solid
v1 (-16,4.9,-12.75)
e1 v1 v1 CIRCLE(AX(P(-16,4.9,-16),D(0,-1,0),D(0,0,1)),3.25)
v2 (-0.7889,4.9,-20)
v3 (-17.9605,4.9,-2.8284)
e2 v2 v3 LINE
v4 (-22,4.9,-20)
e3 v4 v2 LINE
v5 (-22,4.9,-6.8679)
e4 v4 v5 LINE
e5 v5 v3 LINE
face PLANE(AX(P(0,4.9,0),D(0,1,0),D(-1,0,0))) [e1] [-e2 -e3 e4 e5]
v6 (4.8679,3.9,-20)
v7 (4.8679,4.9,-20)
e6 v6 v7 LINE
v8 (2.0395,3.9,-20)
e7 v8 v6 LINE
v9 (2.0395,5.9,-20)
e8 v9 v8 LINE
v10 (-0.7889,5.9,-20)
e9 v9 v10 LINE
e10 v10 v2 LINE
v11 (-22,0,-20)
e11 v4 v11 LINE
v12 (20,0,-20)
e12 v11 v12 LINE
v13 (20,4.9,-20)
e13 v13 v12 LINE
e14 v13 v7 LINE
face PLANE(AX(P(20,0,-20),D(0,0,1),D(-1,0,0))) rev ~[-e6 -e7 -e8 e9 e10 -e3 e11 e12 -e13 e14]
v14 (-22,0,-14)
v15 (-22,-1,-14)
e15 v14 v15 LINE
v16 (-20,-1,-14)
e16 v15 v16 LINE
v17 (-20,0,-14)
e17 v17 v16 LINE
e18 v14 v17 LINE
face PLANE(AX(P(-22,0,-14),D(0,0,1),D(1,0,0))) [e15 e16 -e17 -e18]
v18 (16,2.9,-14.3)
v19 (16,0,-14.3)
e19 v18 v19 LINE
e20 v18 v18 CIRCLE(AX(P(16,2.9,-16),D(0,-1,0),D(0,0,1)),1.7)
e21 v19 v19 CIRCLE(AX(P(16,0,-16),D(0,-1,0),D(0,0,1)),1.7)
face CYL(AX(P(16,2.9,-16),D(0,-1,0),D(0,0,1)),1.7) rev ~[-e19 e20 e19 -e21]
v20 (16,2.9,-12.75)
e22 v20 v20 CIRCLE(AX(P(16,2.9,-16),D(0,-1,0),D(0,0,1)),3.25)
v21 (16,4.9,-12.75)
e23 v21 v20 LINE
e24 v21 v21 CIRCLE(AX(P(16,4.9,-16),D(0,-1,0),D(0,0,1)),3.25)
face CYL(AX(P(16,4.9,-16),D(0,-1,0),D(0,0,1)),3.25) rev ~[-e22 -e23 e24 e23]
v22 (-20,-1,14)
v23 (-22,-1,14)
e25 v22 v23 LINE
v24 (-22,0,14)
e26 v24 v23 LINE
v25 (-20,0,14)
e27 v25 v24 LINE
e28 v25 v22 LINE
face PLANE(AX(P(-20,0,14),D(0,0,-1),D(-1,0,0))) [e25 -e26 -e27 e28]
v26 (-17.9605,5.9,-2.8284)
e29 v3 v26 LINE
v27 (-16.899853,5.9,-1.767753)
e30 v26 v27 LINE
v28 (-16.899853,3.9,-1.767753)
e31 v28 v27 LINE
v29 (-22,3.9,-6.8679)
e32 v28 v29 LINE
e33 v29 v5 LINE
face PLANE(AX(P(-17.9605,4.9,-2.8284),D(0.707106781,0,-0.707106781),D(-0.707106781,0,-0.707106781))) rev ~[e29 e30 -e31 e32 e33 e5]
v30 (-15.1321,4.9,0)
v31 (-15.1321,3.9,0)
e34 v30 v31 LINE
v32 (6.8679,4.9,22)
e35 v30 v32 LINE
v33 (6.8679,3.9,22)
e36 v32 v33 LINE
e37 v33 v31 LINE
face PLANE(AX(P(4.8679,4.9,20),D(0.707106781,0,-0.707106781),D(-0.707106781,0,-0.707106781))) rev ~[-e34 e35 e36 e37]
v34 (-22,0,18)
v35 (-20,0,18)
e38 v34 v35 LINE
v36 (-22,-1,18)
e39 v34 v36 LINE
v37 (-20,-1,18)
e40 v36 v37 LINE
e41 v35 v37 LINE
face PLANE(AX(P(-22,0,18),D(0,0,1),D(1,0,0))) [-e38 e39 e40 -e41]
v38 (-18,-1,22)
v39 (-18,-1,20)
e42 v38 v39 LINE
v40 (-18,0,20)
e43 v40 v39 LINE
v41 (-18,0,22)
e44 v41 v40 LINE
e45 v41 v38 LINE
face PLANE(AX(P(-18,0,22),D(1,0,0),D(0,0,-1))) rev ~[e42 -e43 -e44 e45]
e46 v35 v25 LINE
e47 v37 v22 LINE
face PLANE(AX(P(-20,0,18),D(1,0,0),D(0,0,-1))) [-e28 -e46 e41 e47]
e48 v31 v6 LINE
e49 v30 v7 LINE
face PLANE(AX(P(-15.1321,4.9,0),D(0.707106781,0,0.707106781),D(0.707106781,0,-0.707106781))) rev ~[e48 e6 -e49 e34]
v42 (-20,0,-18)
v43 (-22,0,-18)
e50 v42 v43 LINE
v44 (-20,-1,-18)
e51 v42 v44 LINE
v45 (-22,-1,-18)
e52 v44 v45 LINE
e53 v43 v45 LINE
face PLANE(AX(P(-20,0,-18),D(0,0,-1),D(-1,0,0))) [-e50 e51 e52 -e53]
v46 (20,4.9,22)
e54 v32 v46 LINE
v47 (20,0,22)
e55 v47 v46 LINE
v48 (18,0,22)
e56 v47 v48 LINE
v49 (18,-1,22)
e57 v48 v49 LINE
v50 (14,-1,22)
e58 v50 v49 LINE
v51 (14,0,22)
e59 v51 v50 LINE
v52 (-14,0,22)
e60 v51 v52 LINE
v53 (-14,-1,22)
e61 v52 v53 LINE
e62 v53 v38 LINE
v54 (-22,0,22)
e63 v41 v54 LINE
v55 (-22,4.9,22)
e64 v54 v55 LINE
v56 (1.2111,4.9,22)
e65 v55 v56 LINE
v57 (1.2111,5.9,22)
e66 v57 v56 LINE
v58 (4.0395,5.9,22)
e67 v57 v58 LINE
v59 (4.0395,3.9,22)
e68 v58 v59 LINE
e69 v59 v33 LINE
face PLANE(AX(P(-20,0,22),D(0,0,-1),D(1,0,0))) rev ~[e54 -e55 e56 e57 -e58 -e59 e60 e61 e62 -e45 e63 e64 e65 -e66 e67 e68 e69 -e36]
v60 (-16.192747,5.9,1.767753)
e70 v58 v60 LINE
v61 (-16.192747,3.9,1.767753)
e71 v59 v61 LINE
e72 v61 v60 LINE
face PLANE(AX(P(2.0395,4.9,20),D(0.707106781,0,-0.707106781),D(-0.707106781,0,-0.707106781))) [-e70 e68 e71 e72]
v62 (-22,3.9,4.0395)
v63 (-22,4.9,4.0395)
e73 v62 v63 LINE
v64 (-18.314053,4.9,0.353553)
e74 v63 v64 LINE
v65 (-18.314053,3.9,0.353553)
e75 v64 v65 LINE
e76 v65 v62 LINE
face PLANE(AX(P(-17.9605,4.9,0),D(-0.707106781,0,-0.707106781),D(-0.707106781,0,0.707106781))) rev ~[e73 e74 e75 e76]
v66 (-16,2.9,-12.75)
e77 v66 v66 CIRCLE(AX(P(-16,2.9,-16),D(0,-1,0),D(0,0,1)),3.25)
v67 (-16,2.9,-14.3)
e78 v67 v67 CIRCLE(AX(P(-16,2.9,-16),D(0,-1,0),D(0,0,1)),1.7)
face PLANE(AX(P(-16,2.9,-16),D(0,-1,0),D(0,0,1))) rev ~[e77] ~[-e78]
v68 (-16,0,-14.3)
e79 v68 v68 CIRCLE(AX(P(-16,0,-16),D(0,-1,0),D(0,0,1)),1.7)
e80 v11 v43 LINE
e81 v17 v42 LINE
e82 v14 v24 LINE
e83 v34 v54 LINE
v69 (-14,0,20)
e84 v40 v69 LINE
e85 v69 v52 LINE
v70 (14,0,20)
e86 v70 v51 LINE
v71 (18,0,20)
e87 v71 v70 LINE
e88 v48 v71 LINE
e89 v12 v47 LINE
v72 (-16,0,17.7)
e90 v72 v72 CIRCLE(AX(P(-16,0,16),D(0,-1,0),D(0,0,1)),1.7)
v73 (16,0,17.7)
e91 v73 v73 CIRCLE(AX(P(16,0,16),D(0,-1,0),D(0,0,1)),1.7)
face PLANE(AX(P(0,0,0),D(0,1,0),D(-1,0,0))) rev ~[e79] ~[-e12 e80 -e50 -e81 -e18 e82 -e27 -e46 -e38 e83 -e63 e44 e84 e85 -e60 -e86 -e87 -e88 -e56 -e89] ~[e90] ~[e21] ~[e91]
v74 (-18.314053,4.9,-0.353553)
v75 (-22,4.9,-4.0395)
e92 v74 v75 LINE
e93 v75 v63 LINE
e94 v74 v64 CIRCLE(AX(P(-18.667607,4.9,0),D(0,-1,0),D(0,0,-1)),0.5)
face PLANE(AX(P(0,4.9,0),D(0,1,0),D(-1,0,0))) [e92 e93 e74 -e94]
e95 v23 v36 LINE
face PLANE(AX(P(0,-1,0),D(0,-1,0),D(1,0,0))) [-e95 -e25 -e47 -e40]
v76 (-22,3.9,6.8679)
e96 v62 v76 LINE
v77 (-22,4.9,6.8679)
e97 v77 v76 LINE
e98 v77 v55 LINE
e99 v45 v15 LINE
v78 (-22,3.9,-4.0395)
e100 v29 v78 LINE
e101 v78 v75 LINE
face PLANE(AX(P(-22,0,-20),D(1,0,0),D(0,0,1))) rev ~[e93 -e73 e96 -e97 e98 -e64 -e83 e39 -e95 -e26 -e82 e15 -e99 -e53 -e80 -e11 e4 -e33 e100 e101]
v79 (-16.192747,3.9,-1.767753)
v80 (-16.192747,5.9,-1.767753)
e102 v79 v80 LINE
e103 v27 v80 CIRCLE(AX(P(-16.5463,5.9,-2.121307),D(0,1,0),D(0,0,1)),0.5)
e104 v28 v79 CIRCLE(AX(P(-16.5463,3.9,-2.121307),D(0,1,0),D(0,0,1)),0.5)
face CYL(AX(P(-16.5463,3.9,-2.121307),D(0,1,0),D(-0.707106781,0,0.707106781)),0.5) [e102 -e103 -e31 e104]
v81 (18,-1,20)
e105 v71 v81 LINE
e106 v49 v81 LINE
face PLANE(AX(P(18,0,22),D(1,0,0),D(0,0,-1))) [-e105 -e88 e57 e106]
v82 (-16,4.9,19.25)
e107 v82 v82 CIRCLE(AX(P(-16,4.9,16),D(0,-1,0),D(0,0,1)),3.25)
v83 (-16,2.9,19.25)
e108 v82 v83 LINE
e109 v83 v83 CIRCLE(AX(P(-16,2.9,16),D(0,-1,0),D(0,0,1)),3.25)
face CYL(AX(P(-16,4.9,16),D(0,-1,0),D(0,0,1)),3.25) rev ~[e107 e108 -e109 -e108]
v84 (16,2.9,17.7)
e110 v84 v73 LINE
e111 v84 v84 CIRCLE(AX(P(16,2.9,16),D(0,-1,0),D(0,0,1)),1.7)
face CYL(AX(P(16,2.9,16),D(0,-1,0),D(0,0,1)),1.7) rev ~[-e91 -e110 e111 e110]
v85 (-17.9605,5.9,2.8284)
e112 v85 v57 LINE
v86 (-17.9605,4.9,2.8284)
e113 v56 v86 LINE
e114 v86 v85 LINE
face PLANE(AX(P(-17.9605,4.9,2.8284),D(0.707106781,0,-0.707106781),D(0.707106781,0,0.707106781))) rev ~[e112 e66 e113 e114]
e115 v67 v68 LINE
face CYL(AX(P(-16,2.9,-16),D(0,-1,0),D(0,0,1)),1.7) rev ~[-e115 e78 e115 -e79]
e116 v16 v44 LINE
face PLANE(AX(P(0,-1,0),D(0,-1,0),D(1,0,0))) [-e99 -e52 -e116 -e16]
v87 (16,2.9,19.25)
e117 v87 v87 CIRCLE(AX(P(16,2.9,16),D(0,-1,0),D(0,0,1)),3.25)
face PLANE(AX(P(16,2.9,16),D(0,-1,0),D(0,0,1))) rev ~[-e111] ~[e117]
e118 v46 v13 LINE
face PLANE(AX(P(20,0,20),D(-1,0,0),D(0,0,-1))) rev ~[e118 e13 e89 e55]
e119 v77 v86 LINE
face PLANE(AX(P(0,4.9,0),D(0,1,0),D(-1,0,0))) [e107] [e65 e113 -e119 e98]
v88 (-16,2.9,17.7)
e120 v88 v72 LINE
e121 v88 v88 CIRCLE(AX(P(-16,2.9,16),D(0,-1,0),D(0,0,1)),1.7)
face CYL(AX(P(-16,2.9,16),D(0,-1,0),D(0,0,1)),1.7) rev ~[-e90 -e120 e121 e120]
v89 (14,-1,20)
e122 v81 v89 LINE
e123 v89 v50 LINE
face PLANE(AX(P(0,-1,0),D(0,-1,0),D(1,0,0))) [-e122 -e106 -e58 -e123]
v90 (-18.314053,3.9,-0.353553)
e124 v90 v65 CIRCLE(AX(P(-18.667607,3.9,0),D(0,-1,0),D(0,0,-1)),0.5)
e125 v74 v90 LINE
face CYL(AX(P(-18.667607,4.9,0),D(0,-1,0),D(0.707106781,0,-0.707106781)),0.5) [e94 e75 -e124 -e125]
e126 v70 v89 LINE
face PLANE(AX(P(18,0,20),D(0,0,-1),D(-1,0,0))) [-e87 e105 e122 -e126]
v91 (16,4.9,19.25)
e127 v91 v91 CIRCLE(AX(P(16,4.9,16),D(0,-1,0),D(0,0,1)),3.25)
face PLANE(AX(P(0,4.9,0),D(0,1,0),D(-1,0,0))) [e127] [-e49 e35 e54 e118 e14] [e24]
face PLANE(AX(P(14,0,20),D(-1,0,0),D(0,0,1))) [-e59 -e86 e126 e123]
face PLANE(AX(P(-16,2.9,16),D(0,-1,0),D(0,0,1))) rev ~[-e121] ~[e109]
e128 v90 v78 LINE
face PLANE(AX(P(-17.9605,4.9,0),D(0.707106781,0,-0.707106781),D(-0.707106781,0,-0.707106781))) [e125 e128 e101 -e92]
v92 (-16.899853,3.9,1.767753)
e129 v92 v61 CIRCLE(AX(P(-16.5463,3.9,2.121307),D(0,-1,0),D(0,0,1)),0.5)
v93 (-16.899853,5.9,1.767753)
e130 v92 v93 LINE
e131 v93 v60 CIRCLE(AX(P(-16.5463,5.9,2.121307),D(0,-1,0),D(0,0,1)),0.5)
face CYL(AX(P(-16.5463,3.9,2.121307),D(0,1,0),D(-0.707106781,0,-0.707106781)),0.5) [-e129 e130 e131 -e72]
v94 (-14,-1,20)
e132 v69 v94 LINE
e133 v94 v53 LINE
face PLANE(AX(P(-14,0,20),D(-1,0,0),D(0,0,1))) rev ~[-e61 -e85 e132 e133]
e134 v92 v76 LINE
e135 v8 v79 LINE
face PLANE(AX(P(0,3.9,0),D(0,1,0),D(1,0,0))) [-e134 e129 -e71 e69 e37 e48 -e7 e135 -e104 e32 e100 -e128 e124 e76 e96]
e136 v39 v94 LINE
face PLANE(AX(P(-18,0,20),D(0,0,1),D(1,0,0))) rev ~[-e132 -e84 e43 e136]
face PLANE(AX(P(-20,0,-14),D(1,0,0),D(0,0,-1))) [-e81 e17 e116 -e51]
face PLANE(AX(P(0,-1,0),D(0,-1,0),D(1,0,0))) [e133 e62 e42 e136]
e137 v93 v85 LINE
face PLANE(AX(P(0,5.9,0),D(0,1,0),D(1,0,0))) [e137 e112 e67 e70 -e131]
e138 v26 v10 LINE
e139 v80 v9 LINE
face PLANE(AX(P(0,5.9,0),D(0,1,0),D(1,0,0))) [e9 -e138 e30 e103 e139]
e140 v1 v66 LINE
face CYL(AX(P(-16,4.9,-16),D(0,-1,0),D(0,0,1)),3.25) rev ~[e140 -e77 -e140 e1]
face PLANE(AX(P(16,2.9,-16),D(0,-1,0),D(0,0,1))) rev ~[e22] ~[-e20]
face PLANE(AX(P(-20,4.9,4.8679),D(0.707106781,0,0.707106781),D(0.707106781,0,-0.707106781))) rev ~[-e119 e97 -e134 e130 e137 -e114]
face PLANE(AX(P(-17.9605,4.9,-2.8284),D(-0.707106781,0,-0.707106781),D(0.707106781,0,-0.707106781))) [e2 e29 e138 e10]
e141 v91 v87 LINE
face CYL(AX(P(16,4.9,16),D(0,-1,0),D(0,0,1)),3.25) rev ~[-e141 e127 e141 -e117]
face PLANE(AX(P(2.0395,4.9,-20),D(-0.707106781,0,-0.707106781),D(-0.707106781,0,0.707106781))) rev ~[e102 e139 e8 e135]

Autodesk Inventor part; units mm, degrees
ref_plane "YZ Plane" through (0, 0, 0) normal (1, 0, 0) x (0, 1, 0)
ref_plane "XZ Plane" through (0, 0, 0) normal (0, 1, 0) x (-1, 0, 0)
ref_plane "XY Plane" through (0, 0, 0) normal (0, 0, 1) x (1, 0, 0)
sketch "Sketch1" plane through (0, 0, 0) normal (0, 1, 0) x (-1, 0, 0)
  line L0 (20, 20) -> (-20, 20)
  line L1 (-20, 20) -> (-20, -20)
  line L2 (-20, -20) -> (20, -20)
  line L3 (20, -20) -> (20, 20)
  line L4 (20, 20) -> (-20, -20) construction
  point P0 (0, 0)
  point P1 (0, 0)
  dimension "d6" = 40
  dimension "d7" = 40
extrude "Extrusion2" add sketch "Sketch1" along normal blind 4.9
sketch "Sketch2" plane through (0, 4.9, 0) normal (0, 1, 0) x (1, 0, 0)
  line L0 (-19.8943, 8.5431) -> (-13.3498, 8.5431) construction
  line L1 (-16.5463, 1.4142) -> (2.0395, 20)
  line L2 (20, 20) -> (-20, 20) projected
  line L3 (-20, 20) -> (-20, -20) projected
  line L4 (-20, 0) -> (20, 0)
  line L5 (20, -20) -> (20, 20) projected
  line L6 (-16.5463, 1.4142) -> (-17.9605, 2.8284)
  line L7 (-17.9605, 2.8284) -> (-0.7889, 20)
  line L8 (-16.5463, -1.4142) -> (2.0395, -20)
  line L9 (20, -20) -> (-20, -20)
  line L10 (-16.5463, -1.4142) -> (-17.9605, -2.8284)
  line L11 (-17.9605, -2.8284) -> (-0.7889, -20)
  line L12 (-16.5463, 1.4142) -> (-12.694, -2.4381) construction
  point P0 (0, 0)
  dimension "d17" = 12.7
  dimension "d18" = 135
  dimension "d19" = 2
  dimension "d51" = 2
extrude "Extrusion3" add sketch "Sketch2" along normal blind 1 contours L6 L7 L2 L1 | L9 L11 L10 L8
sketch "Sketch3" plane through (0, 4.9, 0) normal (0, 1, 0) x (1, 0, 0)
  line L0 (-20, -20) -> (-20, 20) construction
  line L1 (-20, 20) -> (-0.7889, 20) construction
  line L2 (-17.9605, 2.8284) -> (-0.7889, 20) construction
  line L3 (-16.5463, 1.4142) -> (-17.9605, 2.8284) construction
  line L4 (2.0395, 20) -> (-16.5463, 1.4142) construction
  line L5 (2.0395, 20) -> (20, 20) construction
  line L6 (20, 20) -> (20, -20) construction
  line L7 (20, -20) -> (2.0395, -20) construction
  line L8 (2.0395, -20) -> (-0.7889, -20) construction
  line L9 (-0.7889, -20) -> (-20, -20) construction
  line L10 (-0.7889, 20) -> (2.0395, 20) construction
  line L11 (-16.5463, -1.4142) -> (2.0395, -20) construction
  line L12 (-17.9605, -2.8284) -> (-16.5463, -1.4142) construction
  line L13 (-0.7889, -20) -> (-17.9605, -2.8284) construction
  line L14 (2.0395, -20) -> (20, -20) projected
  line L15 (-20, 20) -> (-20, -20) projected
  line L16 (20, 20) -> (2.0395, 20) projected
  line L17 (-17.9605, 2.8284) -> (-16.5463, 1.4142) projected
  line L18 (2.0395, 20) -> (-16.5463, 1.4142)
  line L19 (-17.9605, 0) -> (-20, -2.0395)
  line L20 (2.0395, -20) -> (-16.5463, -1.4142)
  line L21 (-17.9605, 0) -> (-20, 2.0395)
  line L22 (2.0395, -20) -> (-16.5463, -1.4142) projected
  line L23 (-16.5463, 1.4142) -> (2.0395, 20) projected
  line L24 (4.8679, -20) -> (-15.1321, 0)
  line L25 (-16.5463, 1.4142) -> (-20, 4.8679)
  line L26 (-20, -4.8679) -> (-16.5463, -1.4142)
  line L27 (-15.1321, 0) -> (4.8679, 20)
  line L28 (-20, -2.0395) -> (-20, -4.8679)
  line L29 (-20, 2.0395) -> (-20, 4.8679)
extrude "Extrusion4" cut sketch "Sketch3" against normal blind 1 contours L20 L26 L15 L19 L21 L25 L17 L18 L16 L27 L24 L14
sketch "Sketch4" plane through (0, 4.9, 0) normal (0, 1, 0) x (1, 0, 0)
  line L0 (16, -16) -> (-16, -16)
  line L1 (-16, -16) -> (-16, 16)
  line L2 (-16, 16) -> (16, 16)
  line L3 (16, 16) -> (16, -16)
  line L4 (16, -16) -> (-16, 16) construction
  line L5 (-16, -16) -> (16, 16) construction
  point P0 (0, 0)
  dimension "d27" = 32
  dimension "d28" = 32
hole "Hole1" at (-16, 4.9, -16) at (16, 4.9, -16) at (16, 4.9, 16) at (-16, 4.9, 16) direction (0, -1, 0) diameter 3.4 end through all counterbore diameter 6.5 counterbore depth 2 clearance for "Socket Head Cap Screw ISO 4762" size "M3" standard "ISO"
move faces "Move1" translate (-2, 0, 0) faces at (-20, 1.3, -1.6226)
move faces "Move2" translate (0, 0, 2) faces at (0.0132, 1.3, 20)
sketch "Sketch5" plane through (0, 0, 0) normal (0, -1, 0) x (1, 0, 0)
  line L0 (-22, -20) -> (-22, 22) construction
  line L1 (-0.7889, -20) -> (-22, -20) projected
  line L2 (-22, 22) -> (-20, 22) construction
  line L3 (-20, 20) -> (-20, -20) construction
  line L4 (-20, -20) -> (-22, -20) construction
  line L5 (-22, -20) -> (-22, 22) construction
  line L6 (-22, 22) -> (20, 22) construction
  line L7 (20, 22) -> (20, -20) construction
  line L8 (-22, 22) -> (20, 22) construction
  line L9 (20, 22) -> (20, 20) construction
  line L10 (20, 20) -> (-20, 20) construction
  line L11 (-22, 20) -> (-22, 22) construction
  line L12 (-22, 22) -> (1.2111, 22) construction
  line L13 (-14, 22) -> (-18, 22)
  line L14 (-18, 22) -> (-18, 20)
  line L15 (-18, 20) -> (-14, 20)
  line L16 (-14, 20) -> (-14, 22)
  line L17 (18, 20) -> (14, 20)
  line L18 (14, 20) -> (14, 22)
  line L19 (14, 22) -> (18, 22)
  line L20 (18, 22) -> (18, 20)
  line L21 (0, 0) -> (0, 24.7178)
  line L22 (-20, 14) -> (-22, 14)
  line L23 (-22, 14) -> (-22, 18)
  line L24 (-22, 18) -> (-20, 18)
  line L25 (-20, 18) -> (-20, 14)
  line L26 (-20, -18) -> (-22, -18)
  line L27 (-22, -18) -> (-22, -14)
  line L28 (-22, -14) -> (-20, -14)
  line L29 (-20, -14) -> (-20, -18)
  line L30 (0, 0) -> (-29.8297, 0)
  dimension "d42" = 2
  dimension "d43" = 2
  dimension "d46" = 28
  dimension "d47" = 4
  dimension "d49" = 4
  dimension "d50" = 28
extrude "Extrusion5" add sketch "Sketch5" along normal blind 1
fillet "Fillet2" radius 0.5 3 edges at (-16.5463, 4.9, -1.4142) (-17.9605, 4.4, 0) (-16.5463, 4.9, 1.4142)
equation "\"d6\" = edge"
equation "\"d7\" = edge"
equation "\"d14\" = workingThickness"
equation "\"d17\" = 0.5 * cubeEdge"
equation "\"d19\" = 2 * upstand"
equation "\"d21\" = upstand"
equation "\"d25\" = glueGrooveDepth"
equation "\"d27\" = holePatternEdge"
equation "\"d28\" = d27"
equation "\"d44\" = upstand"
equation "\"edge\" = 40"
equation "\"holePatternEdge\" = 32"
equation "\"workingThickness\" = 4.9"
equation "\"cubeEdge\" = 25.4"
equation "\"upstand\" = 1"
equation "\"glueGrooveDepth\" = 1"
properties part number "FAB-OX0006"
